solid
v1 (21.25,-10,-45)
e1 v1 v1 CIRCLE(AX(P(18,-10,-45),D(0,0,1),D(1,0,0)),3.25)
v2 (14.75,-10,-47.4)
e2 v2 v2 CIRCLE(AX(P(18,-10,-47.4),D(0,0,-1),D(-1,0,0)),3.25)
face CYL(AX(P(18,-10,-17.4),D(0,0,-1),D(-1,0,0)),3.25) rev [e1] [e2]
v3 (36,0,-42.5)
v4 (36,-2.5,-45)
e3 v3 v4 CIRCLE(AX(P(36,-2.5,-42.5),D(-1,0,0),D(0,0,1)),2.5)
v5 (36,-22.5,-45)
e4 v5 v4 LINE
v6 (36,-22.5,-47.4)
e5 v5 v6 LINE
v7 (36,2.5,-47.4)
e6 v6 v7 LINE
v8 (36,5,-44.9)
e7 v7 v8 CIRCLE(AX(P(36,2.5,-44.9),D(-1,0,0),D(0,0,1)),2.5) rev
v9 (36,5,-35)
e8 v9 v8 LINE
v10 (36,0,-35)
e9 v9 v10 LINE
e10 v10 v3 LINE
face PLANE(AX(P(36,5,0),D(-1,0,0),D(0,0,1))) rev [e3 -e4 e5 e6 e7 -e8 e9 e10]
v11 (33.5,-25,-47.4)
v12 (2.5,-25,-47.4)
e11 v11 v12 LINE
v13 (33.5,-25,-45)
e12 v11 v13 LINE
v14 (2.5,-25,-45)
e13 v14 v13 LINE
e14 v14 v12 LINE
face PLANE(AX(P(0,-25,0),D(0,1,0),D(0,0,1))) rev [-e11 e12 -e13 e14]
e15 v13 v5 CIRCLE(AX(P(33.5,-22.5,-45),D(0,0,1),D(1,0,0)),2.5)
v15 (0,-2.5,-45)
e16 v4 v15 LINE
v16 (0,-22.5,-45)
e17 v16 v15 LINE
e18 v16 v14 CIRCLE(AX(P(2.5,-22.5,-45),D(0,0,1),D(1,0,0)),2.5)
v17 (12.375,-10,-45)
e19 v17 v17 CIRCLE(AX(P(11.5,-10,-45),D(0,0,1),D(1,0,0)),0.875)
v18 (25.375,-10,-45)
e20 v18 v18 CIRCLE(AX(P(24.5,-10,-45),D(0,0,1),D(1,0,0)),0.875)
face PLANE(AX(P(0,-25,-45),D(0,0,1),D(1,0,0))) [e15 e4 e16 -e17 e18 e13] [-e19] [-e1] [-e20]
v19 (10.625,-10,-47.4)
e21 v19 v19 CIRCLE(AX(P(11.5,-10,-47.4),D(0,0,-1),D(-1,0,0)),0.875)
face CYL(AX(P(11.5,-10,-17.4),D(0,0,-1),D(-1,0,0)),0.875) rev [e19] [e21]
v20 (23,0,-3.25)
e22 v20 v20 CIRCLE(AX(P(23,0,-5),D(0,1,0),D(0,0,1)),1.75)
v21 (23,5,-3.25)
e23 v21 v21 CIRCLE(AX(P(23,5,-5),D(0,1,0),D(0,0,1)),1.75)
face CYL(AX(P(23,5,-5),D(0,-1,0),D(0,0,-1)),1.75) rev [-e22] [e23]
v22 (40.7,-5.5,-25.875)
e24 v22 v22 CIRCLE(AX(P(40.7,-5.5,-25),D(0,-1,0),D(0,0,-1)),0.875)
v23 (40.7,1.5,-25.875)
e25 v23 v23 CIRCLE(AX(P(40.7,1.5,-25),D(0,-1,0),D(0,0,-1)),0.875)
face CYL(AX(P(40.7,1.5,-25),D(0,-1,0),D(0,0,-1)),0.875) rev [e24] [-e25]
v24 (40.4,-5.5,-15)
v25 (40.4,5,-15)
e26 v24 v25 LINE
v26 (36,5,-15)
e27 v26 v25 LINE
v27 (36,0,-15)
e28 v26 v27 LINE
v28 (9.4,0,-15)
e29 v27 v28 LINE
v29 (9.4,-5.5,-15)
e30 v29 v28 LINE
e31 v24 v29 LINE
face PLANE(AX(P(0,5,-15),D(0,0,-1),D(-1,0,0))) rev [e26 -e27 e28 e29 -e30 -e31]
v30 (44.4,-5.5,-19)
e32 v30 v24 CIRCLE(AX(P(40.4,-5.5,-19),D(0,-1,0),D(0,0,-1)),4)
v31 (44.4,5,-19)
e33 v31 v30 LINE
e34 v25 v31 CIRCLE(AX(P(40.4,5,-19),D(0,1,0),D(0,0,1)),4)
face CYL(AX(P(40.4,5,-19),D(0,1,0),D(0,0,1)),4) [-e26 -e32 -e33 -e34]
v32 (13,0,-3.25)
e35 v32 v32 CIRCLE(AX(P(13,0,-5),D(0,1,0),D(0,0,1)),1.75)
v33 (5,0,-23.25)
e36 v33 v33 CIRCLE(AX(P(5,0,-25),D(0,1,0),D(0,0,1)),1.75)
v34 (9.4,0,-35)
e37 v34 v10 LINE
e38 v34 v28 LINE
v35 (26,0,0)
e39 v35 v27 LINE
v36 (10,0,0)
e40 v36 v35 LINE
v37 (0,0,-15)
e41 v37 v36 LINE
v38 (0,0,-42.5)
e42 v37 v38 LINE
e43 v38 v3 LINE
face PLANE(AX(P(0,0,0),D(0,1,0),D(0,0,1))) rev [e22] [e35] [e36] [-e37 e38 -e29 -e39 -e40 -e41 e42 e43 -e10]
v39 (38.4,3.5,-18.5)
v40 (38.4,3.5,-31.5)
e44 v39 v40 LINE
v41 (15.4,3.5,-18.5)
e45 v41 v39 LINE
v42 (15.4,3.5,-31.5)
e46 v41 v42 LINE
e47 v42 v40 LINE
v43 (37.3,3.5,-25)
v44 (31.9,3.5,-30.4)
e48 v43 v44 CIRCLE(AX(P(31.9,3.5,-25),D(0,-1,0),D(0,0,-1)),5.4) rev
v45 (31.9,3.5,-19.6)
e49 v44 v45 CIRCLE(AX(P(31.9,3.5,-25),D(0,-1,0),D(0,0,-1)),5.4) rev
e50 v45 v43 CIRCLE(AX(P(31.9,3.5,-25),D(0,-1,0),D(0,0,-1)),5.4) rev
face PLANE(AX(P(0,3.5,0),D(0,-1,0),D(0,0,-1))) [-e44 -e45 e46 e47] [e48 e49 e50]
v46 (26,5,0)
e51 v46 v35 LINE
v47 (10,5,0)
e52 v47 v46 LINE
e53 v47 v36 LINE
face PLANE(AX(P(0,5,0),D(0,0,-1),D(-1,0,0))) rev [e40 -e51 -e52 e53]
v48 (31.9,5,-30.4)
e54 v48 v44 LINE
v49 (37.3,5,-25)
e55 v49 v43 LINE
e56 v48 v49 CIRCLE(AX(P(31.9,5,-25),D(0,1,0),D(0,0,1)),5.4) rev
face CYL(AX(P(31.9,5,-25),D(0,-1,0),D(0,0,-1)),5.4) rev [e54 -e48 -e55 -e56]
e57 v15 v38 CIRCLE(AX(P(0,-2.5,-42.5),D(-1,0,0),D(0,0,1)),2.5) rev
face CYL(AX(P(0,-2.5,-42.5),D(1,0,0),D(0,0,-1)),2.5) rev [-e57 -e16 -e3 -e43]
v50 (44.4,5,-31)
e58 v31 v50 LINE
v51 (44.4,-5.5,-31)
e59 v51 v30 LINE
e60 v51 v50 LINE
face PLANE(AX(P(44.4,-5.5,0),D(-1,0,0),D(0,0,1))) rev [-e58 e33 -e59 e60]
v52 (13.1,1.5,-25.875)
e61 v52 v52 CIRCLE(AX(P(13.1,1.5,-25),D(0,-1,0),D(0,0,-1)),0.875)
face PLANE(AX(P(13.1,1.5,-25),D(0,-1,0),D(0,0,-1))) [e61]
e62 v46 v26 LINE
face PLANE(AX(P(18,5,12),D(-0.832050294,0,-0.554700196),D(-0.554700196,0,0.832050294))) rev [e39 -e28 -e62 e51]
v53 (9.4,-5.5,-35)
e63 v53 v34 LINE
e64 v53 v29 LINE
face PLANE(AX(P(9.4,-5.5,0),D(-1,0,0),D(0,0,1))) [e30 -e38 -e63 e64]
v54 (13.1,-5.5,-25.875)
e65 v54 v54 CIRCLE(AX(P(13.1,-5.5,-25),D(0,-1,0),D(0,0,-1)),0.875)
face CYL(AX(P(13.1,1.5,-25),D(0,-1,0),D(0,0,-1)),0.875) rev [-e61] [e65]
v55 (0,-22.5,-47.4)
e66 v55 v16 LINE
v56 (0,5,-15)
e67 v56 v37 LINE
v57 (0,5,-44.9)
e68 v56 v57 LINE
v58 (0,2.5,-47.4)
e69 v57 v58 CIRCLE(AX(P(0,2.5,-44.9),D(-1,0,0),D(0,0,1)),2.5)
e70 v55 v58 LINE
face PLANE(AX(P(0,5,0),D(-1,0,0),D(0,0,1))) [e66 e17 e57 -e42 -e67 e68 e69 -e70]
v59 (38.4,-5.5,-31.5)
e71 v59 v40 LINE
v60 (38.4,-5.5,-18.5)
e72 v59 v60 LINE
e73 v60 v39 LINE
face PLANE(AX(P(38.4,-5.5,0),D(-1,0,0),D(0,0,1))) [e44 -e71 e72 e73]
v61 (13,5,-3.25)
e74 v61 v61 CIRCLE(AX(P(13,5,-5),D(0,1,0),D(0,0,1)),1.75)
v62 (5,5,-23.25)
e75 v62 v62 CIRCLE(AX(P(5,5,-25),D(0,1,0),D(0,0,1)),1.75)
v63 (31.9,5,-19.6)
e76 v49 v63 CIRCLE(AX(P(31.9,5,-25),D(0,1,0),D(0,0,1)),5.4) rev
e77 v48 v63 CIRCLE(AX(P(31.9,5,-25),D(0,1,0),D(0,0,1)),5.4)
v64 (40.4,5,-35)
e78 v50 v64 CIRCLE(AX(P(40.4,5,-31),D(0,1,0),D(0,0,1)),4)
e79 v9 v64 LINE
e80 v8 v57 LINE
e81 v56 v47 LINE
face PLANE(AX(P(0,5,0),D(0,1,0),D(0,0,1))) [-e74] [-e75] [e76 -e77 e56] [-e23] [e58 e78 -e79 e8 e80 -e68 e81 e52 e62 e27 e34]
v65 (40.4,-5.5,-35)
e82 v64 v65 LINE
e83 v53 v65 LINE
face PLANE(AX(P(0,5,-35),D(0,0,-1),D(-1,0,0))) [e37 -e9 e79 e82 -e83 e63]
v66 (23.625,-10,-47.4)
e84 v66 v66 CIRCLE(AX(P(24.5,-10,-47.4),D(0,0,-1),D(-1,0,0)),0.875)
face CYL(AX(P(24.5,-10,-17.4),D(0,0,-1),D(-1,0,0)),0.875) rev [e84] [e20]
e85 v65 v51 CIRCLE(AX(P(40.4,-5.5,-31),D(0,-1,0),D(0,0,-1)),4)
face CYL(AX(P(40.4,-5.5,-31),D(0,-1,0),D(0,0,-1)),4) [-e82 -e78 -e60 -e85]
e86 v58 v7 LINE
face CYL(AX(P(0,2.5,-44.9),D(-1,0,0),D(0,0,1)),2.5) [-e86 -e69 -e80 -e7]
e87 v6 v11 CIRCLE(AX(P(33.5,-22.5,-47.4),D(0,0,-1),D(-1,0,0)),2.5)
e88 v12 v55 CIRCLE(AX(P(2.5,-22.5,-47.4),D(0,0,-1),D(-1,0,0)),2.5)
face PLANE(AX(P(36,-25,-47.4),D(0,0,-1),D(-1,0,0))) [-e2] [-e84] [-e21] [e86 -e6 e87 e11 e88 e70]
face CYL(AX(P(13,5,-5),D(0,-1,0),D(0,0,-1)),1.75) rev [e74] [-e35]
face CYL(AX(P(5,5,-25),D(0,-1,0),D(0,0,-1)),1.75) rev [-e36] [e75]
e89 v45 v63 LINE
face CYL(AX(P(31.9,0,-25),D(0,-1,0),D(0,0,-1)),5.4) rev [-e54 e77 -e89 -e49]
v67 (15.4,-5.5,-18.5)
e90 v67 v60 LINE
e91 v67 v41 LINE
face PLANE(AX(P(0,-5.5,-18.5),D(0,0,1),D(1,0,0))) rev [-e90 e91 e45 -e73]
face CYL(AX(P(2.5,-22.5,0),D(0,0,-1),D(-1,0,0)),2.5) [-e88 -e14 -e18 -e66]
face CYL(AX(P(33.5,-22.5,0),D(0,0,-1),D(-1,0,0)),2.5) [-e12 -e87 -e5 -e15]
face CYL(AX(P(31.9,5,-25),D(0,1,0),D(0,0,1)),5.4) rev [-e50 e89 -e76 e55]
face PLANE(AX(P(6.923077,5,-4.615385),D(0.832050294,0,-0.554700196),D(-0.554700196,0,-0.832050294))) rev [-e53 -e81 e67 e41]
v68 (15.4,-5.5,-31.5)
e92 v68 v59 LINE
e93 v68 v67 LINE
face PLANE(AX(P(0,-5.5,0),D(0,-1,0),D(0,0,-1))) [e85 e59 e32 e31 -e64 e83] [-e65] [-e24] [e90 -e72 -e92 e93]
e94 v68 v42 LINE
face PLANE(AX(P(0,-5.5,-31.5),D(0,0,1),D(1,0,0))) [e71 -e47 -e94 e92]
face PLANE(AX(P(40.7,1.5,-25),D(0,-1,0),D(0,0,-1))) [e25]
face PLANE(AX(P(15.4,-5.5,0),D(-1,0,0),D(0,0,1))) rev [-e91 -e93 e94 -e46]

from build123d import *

# Parameters (mm, degrees)
SKETCH1_R           = 1.75
SKETCH1_W           = 7.2
SKETCH1_H           = 5.4
BOSS_EXTRUDE1_DEPTH = 5
FILLET5_RADIUS      = 10
FILLET5_LENGTH      = 5
FILLET2_R           = 5.4
FILLET6_R           = 5.4
SKETCH3_W           = 35
SKETCH3_H           = 20
SKETCH3_W_2         = 23
SKETCH3_H_2         = 13
BOSS_EXTRUDE4_DEPTH = 5.5
SKETCH5_W           = 23
SKETCH5_H           = 13
CUT_EXTRUDE1_DEPTH  = 3.5
CUT_EXTRUDE2_DEPTH  = 76.201396264
FILLET9_R           = 4
SKETCH9_R           = 0.875
CUT_EXTRUDE4_DEPTH  = 7
SKETCH10_W          = 36
SKETCH10_H          = 2.4
BOSS_EXTRUDE5_DEPTH = 30
SKETCH11_R          = 3.25
SKETCH11_R_2        = 0.875
CUT_EXTRUDE5_DEPTH  = 30
FILLET10_R          = 2.5


with BuildPart() as part:
    # Sketch1 → Boss-Extrude1 (new body)
    # profile 1 of 4: a face of its own
    with BuildSketch(Plane(origin=(0, 0, 0), x_dir=(1, 0, 0), z_dir=(0, 1, 0))):
        with BuildLine():
            Line((0, 15), (10, 0))
            Line((10, 0), (26, 0))
            Line((26, 0), (36, 15))
            Line((36, 15), (60, 15))
            Line((60, 15), (60, 25))
            Line((60, 25), (44.5, 25))
            Line((44.5, 25), (44.5, 19.6))
            Line((44.5, 19.6), (37.3, 19.6))
            Line((37.3, 19.6), (26.5, 19.6))
            Line((26.5, 19.6), (26.5, 25))
            Line((26.5, 25), (6.75, 25))
            ThreePointArc((6.75, 25), (5, 23.25), (3.25, 25))
            Line((3.25, 25), (0, 25))
            Line((0, 25), (0, 15))
        make_face()
        with Locations(Location((13, 5, 0), (0, 0, 270))):
            Circle(SKETCH1_R, mode=Mode.SUBTRACT)
        with Locations(Location((23, 5, 0), (0, 0, 270))):
            Circle(SKETCH1_R, mode=Mode.SUBTRACT)
    # profile 2 of 4: a face of its own
    with BuildSketch(Plane(origin=(0, 0, 0), x_dir=(1, 0, 0), z_dir=(0, 1, 0))):
        with BuildLine():
            Line((0, 45), (0, 25))
            Line((0, 25), (3.25, 25))
            ThreePointArc((3.25, 25), (5, 26.75), (6.75, 25))
            Line((6.75, 25), (26.5, 25))
            Line((26.5, 25), (26.5, 30.4))
            Line((26.5, 30.4), (37.3, 30.4))
            Line((37.3, 30.4), (44.5, 30.4))
            Line((44.5, 30.4), (44.5, 25))
            Line((44.5, 25), (60, 25))
            Line((60, 25), (60, 35))
            Line((60, 35), (36, 35))
            Line((36, 35), (36, 45))
            Line((36, 45), (26, 45))
            Line((26, 45), (0, 45))
        make_face()
    # profile 3 of 4: a face of its own
    with BuildSketch(Plane(origin=(0, 0, 0), x_dir=(1, 0, 0), z_dir=(0, 1, 0))):
        with Locations((40.9, 27.7)):
            Rectangle(SKETCH1_W, SKETCH1_H)
    # profile 4 of 4: a face of its own
    with BuildSketch(Plane(origin=(0, 0, 0), x_dir=(1, 0, 0), z_dir=(0, 1, 0))):
        with Locations((40.9, 22.3)):
            Rectangle(SKETCH1_W, SKETCH1_H)
    extrude(amount=BOSS_EXTRUDE1_DEPTH)

    # Fillet5: full round fillet: the end face becomes a half cylinder, R = half its width
    fillet5_face = Plane((60, 2.5, -25), x_dir=(0, -1, 0), z_dir=(1, 0, 0))  # on the end face: x along it, z out of the body
    fillet5_slab = fillet5_face.offset(-FILLET5_RADIUS / 2) * Box(FILLET5_LENGTH, 2 * FILLET5_RADIUS, FILLET5_RADIUS, mode=Mode.PRIVATE)  # the body's end, R deep
    fillet5_round = Plane((50, 2.5, -25), x_dir=(1, 0, 0), z_dir=(0, -1, 0)) * Cylinder(FILLET5_RADIUS, FILLET5_LENGTH, mode=Mode.PRIVATE)  # its axis R under the face
    add(fillet5_slab - fillet5_round, mode=Mode.SUBTRACT)

    # Fillet2
    fillet2_edges = [part.edges().sort_by_distance(p)[0] for p in [
        (26.5, 2.5, -30.4),
        (26.5, 2.5, -19.6),
    ]]
    fillet(fillet2_edges, radius=FILLET2_R - 0.0001)  # a hair under: the kernel refuses the full size

    # Fillet6
    fillet6_edges = [part.edges().sort_by_distance(p)[0] for p in [
        (37.3, 2.5, -19.6),
        (37.3, 2.5, -30.4),
    ]]
    fillet(fillet6_edges, radius=FILLET6_R - 0.0001)  # a hair under: the kernel refuses the full size

    # Sketch3 → Boss-Extrude4 (add)
    with BuildSketch(Plane.XZ):
        with Locations((26.9, -25)):
            Rectangle(SKETCH3_W, SKETCH3_H)
        with Locations((26.9, -25)):
            Rectangle(SKETCH3_W_2, SKETCH3_H_2, mode=Mode.SUBTRACT)
    extrude(amount=BOSS_EXTRUDE4_DEPTH)

    # Sketch5 → Cut-Extrude1 (cut)
    with BuildSketch(Plane.XZ):
        with Locations((26.9, -25)):
            Rectangle(SKETCH5_W, SKETCH5_H)
    extrude(amount=-CUT_EXTRUDE1_DEPTH, mode=Mode.SUBTRACT)

    # Sketch6 → Cut-Extrude2 (cut, through all)
    with BuildSketch(Plane.XZ):
        with BuildLine():
            Line((44.4, -15), (44.4, -35))
            Line((44.4, -35), (50, -35))
            ThreePointArc((50, -35), (60, -25), (50, -15))
            Line((50, -15), (44.4, -15))
        make_face()
    extrude(amount=-CUT_EXTRUDE2_DEPTH, mode=Mode.SUBTRACT)

    # Fillet9
    fillet9_edges = [part.edges().sort_by_distance(p)[0] for p in [
        (44.4, -0.25, -35),
        (44.4, -0.25, -15),
    ]]
    fillet(fillet9_edges, radius=FILLET9_R)

    # Sketch9 → Cut-Extrude4 (cut)
    with BuildSketch(Plane.XZ.offset(5.5)):
        with Locations(Location((13.1, -25, 0), (0, 0, 270))):
            Circle(SKETCH9_R)
        with Locations(Location((40.7, -25, 0), (0, 0, 270))):
            Circle(SKETCH9_R)
    extrude(amount=-CUT_EXTRUDE4_DEPTH, mode=Mode.SUBTRACT)

    # Sketch10 → Boss-Extrude5 (add)
    with BuildSketch(Plane(origin=(0, 5, 0), x_dir=(1, 0, 0), z_dir=(0, 1, 0))):
        with Locations((18, 46.2)):
            Rectangle(SKETCH10_W, SKETCH10_H)
    extrude(amount=-BOSS_EXTRUDE5_DEPTH)

    # Sketch11 → Cut-Extrude5 (cut)
    with BuildSketch(Plane(origin=(0, 0, -47.4), x_dir=(-1, 0, 0), z_dir=(0, 0, -1))):
        with Locations((-18, -10)):
            Circle(SKETCH11_R)
        with Locations((-24.5, -10)):
            Circle(SKETCH11_R_2)
        with Locations((-11.5, -10)):
            Circle(SKETCH11_R_2)
    extrude(amount=-CUT_EXTRUDE5_DEPTH, mode=Mode.SUBTRACT)

    # Fillet10
    fillet10_edges = [part.edges().sort_by_distance(p)[0] for p in [
        (0, -25, -46.2),
        (36, -25, -46.2),
        (18, 5, -47.4),
        (18, 0, -45),
    ]]
    fillet(fillet10_edges, radius=FILLET10_R)


solid = part.part
